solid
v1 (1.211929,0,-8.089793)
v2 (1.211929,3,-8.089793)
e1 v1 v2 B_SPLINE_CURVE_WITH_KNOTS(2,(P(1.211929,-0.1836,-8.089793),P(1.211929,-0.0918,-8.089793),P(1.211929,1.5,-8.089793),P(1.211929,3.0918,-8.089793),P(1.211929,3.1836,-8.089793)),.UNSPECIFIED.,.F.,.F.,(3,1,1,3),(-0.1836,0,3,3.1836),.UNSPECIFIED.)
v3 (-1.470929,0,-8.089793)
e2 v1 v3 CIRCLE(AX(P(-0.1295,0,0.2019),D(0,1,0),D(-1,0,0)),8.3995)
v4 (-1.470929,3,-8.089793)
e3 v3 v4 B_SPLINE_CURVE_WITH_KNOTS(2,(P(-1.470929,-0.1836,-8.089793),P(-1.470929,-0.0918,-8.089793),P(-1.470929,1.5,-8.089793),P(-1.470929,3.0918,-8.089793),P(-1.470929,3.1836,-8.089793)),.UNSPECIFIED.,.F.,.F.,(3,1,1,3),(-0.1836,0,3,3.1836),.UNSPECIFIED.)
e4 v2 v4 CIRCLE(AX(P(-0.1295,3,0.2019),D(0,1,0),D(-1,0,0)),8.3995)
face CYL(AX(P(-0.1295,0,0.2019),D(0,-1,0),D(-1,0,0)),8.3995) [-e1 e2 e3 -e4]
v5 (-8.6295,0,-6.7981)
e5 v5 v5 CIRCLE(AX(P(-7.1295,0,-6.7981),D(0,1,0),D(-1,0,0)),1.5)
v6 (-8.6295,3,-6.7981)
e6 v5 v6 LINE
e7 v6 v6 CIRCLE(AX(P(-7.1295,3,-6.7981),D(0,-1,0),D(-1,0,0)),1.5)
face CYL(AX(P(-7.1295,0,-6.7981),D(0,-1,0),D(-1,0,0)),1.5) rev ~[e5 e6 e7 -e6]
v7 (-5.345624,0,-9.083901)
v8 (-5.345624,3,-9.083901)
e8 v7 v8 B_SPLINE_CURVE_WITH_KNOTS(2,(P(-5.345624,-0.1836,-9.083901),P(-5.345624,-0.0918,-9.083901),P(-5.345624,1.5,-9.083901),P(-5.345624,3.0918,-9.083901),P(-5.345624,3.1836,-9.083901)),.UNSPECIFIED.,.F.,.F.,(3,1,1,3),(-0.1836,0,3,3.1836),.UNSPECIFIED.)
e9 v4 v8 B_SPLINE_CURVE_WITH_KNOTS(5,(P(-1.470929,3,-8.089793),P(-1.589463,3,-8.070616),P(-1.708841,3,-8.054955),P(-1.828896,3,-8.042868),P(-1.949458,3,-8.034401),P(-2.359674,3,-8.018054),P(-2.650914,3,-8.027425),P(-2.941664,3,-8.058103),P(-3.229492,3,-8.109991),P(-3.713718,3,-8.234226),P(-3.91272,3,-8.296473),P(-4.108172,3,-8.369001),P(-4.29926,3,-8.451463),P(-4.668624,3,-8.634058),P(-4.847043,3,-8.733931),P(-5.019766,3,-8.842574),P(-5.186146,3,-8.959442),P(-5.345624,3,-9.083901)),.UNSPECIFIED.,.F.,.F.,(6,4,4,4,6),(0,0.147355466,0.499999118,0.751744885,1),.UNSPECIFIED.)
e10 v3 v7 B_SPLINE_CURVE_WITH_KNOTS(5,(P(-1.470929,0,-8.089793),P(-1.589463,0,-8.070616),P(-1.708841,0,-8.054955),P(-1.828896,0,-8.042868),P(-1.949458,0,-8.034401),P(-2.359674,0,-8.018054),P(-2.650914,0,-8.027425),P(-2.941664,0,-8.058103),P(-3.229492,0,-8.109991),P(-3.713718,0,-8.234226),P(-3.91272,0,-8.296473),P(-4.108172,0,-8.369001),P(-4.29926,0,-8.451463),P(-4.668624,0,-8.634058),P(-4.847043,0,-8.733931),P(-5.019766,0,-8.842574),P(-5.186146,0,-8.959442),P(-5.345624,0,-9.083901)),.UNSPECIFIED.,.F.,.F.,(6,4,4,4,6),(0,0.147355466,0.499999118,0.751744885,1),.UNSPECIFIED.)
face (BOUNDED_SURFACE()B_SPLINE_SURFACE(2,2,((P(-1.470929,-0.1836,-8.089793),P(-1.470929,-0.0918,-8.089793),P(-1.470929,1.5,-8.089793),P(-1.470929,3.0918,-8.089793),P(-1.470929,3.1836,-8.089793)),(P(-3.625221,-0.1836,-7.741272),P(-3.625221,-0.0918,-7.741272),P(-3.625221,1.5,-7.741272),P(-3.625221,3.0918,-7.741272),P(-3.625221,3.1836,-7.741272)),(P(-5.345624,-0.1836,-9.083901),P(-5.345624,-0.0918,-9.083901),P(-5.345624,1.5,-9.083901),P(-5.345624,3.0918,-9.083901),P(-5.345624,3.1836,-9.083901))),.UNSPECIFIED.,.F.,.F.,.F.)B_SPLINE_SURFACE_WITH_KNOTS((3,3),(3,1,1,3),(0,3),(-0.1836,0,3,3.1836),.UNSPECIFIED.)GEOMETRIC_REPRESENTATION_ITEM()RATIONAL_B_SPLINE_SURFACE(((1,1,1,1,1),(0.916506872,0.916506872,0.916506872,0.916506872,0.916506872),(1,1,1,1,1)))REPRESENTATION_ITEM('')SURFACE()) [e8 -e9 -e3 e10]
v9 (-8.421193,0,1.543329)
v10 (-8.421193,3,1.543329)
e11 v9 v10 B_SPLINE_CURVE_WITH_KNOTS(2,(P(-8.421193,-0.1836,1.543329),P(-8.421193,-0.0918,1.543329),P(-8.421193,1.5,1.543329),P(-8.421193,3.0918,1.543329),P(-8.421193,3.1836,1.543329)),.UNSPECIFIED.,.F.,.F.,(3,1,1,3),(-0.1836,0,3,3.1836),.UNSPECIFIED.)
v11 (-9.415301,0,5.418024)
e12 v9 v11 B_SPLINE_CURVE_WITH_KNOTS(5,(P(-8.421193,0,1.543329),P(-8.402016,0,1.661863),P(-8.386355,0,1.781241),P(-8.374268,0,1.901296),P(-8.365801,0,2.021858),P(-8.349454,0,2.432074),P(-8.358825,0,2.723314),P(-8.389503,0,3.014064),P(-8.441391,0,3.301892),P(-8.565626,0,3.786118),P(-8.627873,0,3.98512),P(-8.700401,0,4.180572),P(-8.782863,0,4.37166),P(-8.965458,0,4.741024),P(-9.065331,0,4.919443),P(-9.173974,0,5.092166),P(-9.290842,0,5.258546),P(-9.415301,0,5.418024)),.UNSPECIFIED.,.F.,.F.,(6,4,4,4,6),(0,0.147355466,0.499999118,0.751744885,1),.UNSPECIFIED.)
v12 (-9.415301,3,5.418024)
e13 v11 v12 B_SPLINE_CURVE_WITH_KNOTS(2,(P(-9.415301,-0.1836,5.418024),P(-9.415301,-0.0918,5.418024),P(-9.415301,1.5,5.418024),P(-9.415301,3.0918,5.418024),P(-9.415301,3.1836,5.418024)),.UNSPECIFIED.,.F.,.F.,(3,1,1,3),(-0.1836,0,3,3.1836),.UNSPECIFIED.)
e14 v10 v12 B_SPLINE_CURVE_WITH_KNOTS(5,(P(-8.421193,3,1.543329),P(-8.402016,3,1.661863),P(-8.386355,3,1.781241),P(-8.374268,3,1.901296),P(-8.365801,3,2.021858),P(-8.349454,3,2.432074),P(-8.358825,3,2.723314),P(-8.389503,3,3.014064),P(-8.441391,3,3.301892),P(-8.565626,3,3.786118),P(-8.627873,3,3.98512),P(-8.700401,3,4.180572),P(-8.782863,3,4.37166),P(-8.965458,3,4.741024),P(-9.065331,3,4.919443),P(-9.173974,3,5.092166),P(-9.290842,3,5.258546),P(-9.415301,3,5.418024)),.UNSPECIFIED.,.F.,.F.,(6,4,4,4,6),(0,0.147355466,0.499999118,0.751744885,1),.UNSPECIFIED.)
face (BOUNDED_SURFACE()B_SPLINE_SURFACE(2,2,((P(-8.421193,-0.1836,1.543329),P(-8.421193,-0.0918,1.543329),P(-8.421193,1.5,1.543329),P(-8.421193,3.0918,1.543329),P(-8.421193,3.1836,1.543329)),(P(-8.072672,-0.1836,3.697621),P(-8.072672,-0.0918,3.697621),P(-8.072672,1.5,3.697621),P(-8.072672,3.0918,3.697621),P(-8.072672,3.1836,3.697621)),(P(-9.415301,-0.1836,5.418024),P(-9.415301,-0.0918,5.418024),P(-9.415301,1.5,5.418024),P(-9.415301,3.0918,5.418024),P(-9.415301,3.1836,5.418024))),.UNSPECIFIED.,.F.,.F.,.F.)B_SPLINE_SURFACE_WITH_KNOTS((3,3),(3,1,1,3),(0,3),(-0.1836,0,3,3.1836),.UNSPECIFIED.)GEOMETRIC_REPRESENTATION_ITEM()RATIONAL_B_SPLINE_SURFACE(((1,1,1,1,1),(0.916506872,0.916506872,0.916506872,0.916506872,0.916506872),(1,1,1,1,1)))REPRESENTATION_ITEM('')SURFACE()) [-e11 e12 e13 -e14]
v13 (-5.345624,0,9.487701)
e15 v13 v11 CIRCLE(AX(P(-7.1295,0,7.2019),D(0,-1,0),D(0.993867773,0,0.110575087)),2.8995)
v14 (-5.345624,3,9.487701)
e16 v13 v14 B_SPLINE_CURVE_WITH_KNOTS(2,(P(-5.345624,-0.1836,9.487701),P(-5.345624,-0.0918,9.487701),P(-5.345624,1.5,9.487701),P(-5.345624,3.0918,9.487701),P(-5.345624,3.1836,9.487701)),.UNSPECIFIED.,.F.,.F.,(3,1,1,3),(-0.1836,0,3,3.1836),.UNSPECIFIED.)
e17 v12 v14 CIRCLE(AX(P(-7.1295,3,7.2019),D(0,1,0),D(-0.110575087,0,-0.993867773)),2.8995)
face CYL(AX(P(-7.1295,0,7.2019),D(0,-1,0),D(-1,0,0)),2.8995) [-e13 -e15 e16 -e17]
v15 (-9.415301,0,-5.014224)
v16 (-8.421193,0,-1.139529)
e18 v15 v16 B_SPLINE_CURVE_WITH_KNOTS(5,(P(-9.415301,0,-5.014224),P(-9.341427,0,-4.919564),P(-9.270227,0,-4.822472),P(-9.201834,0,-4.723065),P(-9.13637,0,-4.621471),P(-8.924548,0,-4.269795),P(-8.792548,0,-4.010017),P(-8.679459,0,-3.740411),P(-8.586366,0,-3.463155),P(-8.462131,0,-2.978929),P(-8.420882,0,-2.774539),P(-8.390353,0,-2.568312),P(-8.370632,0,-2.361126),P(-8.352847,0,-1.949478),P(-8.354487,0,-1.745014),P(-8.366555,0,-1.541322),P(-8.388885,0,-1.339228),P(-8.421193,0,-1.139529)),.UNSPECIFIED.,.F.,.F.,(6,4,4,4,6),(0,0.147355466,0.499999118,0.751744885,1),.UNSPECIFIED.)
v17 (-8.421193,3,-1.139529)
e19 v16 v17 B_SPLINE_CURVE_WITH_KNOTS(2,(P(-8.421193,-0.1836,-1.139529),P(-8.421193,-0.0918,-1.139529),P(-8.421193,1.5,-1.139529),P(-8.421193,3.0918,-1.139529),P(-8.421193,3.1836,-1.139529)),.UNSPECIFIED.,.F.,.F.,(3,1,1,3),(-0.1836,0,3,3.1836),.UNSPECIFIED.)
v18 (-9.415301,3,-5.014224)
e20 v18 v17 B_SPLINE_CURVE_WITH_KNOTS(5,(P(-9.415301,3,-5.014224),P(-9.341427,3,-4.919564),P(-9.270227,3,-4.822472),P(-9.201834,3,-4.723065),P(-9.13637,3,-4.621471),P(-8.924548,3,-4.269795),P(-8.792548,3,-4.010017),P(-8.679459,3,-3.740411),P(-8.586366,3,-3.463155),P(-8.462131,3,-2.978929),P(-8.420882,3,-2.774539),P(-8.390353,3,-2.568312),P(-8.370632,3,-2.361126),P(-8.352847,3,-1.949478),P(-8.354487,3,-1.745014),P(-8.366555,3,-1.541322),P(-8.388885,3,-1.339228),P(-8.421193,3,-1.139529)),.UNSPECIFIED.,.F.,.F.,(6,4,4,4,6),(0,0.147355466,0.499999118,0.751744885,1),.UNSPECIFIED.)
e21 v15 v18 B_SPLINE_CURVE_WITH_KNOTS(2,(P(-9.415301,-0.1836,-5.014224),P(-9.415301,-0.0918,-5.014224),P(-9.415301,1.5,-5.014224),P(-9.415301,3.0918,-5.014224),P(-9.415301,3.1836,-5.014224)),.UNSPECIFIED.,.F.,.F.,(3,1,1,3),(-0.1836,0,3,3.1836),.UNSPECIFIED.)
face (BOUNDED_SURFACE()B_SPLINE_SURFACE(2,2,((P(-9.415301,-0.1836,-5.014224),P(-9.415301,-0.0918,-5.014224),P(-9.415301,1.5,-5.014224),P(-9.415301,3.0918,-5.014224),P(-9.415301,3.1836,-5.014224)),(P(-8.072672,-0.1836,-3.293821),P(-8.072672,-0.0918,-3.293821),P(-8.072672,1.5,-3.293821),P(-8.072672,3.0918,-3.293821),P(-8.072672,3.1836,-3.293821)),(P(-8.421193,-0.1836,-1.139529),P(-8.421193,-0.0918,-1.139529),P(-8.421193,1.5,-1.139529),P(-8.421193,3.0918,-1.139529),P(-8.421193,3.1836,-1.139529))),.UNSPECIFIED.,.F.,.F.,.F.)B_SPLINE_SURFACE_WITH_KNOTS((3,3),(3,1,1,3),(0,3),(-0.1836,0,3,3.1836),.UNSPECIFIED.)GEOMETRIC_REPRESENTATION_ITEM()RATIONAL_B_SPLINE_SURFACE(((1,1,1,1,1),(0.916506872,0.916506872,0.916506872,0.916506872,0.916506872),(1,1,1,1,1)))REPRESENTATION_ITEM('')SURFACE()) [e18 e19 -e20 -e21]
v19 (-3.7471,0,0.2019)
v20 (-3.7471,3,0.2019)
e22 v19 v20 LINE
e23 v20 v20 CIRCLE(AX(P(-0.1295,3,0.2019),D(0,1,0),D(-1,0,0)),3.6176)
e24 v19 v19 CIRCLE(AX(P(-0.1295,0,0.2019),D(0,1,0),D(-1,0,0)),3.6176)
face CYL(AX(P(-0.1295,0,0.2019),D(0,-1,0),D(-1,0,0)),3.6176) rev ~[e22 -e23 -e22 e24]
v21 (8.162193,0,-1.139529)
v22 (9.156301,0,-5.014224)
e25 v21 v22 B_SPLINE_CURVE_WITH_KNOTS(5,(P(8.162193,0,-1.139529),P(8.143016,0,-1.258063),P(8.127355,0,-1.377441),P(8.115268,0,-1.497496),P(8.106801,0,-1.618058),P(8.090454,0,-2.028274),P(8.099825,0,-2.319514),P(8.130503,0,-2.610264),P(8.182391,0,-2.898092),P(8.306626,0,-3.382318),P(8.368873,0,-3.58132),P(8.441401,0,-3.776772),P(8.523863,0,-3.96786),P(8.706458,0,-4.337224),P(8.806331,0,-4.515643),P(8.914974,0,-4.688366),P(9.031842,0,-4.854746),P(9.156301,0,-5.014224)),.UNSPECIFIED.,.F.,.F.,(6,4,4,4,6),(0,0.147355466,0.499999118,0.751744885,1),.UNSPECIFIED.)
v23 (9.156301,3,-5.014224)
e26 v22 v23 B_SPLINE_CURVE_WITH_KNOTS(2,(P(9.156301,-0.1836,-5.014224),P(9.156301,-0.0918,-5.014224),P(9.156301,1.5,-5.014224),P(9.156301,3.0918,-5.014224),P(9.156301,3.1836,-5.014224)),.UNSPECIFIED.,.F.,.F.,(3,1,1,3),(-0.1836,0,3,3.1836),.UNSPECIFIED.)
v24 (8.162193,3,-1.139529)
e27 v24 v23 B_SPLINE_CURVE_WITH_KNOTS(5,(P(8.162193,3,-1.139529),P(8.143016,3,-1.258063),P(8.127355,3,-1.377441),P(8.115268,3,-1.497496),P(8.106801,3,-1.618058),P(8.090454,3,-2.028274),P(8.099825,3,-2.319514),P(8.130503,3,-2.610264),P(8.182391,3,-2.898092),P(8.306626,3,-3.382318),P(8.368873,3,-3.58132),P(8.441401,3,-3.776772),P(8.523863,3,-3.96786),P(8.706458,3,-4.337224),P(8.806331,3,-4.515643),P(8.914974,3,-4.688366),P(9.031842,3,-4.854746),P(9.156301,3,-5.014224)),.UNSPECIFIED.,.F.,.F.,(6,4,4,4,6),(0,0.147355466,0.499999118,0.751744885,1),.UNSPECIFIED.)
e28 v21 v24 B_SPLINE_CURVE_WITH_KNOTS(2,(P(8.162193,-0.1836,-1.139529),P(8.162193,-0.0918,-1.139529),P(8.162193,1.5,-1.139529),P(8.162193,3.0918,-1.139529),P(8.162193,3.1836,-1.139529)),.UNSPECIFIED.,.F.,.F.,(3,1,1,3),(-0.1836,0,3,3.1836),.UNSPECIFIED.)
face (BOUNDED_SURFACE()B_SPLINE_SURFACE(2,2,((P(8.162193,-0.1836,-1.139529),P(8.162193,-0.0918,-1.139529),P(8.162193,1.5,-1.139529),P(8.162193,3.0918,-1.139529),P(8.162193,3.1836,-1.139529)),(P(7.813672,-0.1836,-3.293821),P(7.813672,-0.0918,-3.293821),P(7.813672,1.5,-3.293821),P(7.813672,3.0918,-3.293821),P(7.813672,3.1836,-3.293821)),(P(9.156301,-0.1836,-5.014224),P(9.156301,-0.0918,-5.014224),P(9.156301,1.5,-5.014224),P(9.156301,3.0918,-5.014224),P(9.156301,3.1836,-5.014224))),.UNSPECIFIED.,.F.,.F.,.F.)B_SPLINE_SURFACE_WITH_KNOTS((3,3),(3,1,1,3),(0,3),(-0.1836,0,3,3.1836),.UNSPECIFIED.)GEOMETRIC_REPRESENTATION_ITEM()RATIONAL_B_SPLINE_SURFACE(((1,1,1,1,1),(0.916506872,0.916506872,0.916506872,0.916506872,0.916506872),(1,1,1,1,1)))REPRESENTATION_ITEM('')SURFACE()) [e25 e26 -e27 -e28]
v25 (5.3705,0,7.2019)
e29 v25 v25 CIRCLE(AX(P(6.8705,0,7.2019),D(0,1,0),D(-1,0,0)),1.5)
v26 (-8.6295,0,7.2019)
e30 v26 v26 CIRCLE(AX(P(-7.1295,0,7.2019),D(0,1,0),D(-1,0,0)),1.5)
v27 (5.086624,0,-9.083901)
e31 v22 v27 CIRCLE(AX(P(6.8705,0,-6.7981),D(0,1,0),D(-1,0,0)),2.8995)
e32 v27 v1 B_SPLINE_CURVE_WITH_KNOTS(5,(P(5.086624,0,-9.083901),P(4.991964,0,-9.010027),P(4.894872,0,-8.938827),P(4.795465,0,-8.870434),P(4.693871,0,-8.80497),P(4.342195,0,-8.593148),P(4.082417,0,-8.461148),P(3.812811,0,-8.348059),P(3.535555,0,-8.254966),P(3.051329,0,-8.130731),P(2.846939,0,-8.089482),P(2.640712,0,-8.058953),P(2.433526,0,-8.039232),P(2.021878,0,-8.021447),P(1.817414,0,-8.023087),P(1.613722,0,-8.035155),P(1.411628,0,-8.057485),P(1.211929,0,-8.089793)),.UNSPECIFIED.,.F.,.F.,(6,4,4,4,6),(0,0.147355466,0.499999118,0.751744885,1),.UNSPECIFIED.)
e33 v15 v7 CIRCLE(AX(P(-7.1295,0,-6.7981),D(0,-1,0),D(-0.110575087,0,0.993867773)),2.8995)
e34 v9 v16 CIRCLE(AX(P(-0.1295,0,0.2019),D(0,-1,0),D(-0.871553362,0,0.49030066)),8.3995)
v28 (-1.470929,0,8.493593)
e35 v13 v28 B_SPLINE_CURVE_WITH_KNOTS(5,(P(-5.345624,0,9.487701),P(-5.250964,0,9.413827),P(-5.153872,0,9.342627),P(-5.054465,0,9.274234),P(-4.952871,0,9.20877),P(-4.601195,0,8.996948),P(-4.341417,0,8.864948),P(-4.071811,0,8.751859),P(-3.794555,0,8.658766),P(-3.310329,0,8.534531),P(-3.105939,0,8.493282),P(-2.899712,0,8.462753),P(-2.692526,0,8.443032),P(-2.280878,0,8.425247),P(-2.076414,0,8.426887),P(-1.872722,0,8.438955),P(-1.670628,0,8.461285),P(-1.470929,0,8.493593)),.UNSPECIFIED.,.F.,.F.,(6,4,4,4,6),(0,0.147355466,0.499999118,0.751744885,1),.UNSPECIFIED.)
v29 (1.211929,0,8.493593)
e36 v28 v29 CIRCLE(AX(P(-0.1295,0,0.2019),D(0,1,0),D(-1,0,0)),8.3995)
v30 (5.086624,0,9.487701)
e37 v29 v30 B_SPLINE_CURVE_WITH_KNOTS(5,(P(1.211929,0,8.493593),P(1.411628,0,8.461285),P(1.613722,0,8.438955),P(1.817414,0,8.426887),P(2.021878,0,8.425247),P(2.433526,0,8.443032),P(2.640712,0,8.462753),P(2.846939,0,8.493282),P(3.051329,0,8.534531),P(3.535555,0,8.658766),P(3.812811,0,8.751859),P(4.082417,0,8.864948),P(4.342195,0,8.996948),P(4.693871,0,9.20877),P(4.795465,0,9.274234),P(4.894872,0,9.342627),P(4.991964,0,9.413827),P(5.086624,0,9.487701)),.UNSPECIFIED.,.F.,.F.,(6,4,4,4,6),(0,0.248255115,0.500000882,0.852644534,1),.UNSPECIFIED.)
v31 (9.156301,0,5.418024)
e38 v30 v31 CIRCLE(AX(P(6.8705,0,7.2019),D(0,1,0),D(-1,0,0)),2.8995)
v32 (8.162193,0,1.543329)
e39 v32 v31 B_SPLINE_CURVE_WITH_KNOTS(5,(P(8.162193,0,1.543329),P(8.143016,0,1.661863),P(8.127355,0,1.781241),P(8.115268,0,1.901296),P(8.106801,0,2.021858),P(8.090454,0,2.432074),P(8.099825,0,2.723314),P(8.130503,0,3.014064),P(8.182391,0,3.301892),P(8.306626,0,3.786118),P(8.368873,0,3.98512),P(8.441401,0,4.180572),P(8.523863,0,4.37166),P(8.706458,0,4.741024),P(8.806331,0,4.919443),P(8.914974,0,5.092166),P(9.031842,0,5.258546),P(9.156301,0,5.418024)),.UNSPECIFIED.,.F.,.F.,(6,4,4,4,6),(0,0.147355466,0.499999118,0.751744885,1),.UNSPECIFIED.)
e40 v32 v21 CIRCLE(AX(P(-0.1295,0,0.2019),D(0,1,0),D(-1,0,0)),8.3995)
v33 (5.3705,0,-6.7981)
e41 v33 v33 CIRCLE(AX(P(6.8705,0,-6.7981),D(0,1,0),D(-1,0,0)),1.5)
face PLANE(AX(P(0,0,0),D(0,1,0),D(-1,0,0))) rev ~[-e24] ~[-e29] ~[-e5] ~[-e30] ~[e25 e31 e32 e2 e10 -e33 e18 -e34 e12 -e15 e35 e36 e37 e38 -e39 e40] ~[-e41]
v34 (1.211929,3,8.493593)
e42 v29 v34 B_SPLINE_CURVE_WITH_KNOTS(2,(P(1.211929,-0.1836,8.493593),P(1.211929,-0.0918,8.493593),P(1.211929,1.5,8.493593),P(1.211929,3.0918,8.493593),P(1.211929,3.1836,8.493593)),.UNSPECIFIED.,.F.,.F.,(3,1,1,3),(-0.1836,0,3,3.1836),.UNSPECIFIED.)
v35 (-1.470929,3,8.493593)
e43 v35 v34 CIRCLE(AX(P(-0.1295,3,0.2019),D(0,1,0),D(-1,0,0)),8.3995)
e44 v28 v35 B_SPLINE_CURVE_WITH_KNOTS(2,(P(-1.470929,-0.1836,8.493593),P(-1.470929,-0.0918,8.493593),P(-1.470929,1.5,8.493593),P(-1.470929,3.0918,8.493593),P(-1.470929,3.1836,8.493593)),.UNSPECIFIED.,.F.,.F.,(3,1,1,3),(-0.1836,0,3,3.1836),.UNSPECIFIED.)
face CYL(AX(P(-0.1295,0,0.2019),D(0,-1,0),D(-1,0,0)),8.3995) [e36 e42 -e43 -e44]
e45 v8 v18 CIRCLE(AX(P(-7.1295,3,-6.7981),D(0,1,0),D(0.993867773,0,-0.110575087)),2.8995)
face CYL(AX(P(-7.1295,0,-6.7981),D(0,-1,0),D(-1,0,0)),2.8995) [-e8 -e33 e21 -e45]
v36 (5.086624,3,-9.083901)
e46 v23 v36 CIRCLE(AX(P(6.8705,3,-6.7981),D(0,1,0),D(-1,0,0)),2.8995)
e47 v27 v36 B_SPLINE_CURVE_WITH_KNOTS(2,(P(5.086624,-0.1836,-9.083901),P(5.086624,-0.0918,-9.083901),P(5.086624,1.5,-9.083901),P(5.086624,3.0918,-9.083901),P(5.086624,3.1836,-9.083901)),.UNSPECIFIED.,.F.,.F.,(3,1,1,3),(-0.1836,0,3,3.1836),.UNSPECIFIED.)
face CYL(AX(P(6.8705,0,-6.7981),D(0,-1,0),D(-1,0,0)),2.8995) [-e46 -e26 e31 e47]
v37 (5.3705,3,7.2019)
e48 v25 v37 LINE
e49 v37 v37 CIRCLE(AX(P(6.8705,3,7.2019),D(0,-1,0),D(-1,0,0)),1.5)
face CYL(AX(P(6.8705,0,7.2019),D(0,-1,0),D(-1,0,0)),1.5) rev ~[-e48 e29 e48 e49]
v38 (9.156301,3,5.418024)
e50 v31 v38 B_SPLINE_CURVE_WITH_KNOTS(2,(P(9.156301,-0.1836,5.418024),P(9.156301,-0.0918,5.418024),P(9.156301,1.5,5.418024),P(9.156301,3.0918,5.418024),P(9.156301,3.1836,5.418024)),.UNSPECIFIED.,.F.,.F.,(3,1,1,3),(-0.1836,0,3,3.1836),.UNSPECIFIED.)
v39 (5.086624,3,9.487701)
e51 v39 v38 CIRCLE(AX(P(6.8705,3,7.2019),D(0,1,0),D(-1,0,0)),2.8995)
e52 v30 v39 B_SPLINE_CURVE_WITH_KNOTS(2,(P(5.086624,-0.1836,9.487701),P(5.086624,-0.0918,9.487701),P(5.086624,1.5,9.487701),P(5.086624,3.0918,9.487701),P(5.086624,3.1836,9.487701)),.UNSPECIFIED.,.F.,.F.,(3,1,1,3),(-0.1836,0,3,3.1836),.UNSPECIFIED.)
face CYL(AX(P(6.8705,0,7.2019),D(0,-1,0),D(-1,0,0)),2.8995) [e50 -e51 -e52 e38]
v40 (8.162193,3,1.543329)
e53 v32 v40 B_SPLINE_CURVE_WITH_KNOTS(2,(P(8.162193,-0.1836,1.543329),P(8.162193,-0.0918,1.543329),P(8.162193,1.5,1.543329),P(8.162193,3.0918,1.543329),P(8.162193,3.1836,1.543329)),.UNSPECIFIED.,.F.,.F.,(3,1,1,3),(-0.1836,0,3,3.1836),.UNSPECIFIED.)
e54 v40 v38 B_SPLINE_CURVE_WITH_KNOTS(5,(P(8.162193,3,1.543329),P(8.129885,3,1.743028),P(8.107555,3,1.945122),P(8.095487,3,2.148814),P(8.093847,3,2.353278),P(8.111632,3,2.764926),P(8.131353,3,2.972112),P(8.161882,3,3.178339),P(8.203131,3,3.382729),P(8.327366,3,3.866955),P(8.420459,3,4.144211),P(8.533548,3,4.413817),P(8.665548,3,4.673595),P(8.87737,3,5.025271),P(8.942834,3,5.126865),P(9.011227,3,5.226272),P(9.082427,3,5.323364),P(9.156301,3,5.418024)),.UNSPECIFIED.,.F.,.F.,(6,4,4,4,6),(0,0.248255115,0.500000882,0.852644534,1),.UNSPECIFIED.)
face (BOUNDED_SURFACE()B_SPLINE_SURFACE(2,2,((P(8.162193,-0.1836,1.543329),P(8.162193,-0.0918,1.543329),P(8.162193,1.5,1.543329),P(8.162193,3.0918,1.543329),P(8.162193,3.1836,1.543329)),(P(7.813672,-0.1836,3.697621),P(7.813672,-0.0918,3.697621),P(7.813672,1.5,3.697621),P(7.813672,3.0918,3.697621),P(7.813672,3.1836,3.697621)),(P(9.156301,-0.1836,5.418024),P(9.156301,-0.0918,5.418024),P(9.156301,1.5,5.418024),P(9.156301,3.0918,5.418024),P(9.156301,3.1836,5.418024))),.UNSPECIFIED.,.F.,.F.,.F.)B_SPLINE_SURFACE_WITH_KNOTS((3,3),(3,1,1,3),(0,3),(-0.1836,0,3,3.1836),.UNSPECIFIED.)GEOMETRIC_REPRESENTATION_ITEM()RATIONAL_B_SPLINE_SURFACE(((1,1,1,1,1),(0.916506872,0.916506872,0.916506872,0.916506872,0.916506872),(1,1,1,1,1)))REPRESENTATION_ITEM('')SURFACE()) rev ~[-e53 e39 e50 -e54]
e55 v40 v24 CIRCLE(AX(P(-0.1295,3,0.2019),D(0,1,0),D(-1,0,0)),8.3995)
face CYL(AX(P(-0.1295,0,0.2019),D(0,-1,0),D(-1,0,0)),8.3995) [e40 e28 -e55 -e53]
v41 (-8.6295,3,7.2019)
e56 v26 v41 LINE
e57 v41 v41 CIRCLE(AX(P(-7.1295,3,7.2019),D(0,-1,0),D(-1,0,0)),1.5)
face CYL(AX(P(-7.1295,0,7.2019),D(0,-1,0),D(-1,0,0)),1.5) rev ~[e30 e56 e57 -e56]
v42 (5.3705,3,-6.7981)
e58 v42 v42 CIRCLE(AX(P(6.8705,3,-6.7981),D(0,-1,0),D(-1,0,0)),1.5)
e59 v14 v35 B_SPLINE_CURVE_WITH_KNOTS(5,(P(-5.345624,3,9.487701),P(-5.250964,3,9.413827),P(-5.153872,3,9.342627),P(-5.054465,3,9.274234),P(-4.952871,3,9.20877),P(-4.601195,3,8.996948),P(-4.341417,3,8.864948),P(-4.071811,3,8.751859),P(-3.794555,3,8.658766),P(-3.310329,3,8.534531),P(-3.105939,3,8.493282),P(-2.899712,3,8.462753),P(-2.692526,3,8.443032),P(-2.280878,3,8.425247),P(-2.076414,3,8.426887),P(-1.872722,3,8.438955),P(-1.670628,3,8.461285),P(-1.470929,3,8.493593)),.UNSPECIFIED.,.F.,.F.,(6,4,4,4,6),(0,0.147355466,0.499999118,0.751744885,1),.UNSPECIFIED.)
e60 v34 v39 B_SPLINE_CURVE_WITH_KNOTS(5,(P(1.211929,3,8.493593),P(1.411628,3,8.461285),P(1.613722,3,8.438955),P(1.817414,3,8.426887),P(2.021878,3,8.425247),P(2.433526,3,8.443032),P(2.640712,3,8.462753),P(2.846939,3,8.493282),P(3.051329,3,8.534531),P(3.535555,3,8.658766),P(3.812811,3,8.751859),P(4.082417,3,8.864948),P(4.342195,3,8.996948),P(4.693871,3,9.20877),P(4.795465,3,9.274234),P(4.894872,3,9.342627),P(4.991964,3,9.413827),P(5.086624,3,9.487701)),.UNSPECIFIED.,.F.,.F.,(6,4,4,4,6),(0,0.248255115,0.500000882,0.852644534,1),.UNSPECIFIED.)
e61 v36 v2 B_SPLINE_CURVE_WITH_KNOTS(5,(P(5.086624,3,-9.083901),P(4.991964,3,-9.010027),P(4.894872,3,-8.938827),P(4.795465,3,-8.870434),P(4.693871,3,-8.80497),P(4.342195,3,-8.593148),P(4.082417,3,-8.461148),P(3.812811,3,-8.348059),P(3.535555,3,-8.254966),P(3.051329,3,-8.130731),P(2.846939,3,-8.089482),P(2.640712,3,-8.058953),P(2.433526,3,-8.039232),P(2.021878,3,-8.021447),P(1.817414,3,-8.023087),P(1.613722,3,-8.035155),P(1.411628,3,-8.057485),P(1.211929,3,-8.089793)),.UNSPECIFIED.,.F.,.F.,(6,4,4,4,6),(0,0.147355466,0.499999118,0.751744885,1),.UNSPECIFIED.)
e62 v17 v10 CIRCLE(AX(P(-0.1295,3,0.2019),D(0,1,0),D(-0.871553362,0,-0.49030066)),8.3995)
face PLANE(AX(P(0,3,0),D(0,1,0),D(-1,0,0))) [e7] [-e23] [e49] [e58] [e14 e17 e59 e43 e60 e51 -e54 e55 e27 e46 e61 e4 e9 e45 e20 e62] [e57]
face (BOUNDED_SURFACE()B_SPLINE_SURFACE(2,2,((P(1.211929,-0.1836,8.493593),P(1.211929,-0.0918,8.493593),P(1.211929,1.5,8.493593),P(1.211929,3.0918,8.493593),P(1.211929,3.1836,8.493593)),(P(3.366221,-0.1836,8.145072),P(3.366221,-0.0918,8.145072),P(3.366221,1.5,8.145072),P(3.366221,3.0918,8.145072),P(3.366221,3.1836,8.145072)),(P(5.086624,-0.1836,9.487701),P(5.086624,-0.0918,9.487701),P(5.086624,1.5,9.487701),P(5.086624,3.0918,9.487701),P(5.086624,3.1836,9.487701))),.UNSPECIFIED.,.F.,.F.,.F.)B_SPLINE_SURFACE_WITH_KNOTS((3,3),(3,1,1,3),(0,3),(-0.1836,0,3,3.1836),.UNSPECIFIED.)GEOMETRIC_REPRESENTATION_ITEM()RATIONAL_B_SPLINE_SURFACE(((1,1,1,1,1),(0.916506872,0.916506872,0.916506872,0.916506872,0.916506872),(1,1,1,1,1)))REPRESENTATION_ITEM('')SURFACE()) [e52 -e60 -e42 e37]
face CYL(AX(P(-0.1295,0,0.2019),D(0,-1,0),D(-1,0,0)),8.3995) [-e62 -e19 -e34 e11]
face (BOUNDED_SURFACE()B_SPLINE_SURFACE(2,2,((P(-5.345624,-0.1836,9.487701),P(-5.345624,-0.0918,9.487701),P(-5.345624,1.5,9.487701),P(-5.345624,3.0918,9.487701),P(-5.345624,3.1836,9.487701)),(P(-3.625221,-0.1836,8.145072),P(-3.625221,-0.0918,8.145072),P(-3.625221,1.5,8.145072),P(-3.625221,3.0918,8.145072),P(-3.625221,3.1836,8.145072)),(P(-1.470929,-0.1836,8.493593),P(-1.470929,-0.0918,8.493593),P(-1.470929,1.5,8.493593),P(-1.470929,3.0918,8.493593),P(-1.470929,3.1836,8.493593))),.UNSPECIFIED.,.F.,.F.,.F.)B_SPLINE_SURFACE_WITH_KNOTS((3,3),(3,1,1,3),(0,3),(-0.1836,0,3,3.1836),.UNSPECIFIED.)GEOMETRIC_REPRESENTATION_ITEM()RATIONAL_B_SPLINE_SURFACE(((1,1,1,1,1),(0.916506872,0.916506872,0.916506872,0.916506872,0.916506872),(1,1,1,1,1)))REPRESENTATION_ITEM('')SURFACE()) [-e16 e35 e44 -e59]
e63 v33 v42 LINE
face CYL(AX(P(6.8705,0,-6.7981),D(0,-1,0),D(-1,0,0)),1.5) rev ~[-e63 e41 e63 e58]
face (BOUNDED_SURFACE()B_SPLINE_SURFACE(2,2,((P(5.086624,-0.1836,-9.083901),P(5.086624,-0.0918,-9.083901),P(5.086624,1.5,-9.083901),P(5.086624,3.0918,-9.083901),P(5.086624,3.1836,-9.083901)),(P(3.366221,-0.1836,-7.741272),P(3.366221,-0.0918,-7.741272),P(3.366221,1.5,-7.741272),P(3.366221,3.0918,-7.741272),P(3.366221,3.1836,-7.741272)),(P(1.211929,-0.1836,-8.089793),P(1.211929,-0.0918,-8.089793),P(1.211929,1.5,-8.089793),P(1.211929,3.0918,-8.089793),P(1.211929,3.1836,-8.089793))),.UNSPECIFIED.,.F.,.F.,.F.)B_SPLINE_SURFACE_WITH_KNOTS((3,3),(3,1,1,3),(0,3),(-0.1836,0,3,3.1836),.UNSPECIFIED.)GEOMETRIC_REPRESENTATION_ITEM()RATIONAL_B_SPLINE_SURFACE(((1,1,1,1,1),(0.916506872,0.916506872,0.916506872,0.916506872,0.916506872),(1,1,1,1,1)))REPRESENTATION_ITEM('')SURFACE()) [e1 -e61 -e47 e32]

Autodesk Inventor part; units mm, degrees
ref_plane "YZ Plane" through (0, 0, 0) normal (1, 0, 0) x (0, 1, 0)
ref_plane "XZ Plane" through (0, 0, 0) normal (0, 1, 0) x (-1, 0, 0)
ref_plane "XY Plane" through (0, 0, 0) normal (0, 0, 1) x (1, 0, 0)
sketch "Эскиз1" plane through (0, 0, 0) normal (0, 1, 0) x (-1, 0, 0)
  circle A0 centre (0.1295, 0.2019) radius 7
  circle A1 centre (-6.8705, 7.2019) radius 1.5
  circle A2 centre (7.1295, 7.2019) radius 1.5
  circle A3 centre (7.1295, -6.7981) radius 1.5
  circle A4 centre (-6.8705, -6.7981) radius 1.5
  line L0 (-6.8705, -10.8093) -> (-6.8705, 13.8282) construction
  line L1 (14.3213, 7.2019) -> (-16.097, 7.2019) construction
  line L2 (7.1295, -11.068) -> (7.1295, 16.1729) construction
  arc A5 (6.5047, 14.6631) -> (7.1295, 16.1729) centre (4.9928, 16.1729) ccw construction
  line L3 (12.5583, -6.7981) -> (-15.6188, -6.7981) construction
  circle A6 centre (7.1295, 7.2019) radius 2.8995
  circle A7 centre (-6.8705, 7.2019) radius 2.8995
  circle A8 centre (-6.8705, -6.7981) radius 2.8995
  circle A9 centre (7.1295, -6.7981) radius 2.8995
  arc A10 (0.5599, -6.4772) -> (-0.2768, -6.4772) centre (0.1416, -8.4329) ccw
  line L4 (5.6295, -6.7981) -> (0.1295, -6.7981)
  line L5 (7.1295, -5.2981) -> (7.1295, 0.2019)
  line L6 (7.1295, 5.7019) -> (7.1295, 0.2019)
  line L7 (5.6295, 7.2019) -> (-5.3705, 7.2019)
  line L8 (-6.8705, 5.7019) -> (-6.8705, -5.2981)
  line L9 (-5.3705, -6.7981) -> (0.1295, -6.7981)
  circle A11 centre (0.1295, 0.2019) radius 8.3995
  circle A12 centre (0.1295, 0.2019) radius 3.6176
  point P0 (-3.971, 7.2019)
  point P1 (-6.8705, 4.3024)
  point P2 (-6.8705, -3.8986)
  point P3 (-3.971, -6.7981)
  point P4 (4.23, -6.7981)
  point P5 (7.1295, -3.8986)
  point P6 (7.1295, 4.3024)
  point P7 (4.23, 7.2019)
  point P8 (4.2478, 7.5225)
  point P9 (-3.9888, 7.5225)
  point P10 (-7.1911, 4.3202)
  point P11 (-7.1911, -3.9164)
  point P12 (-3.9888, -7.1187)
  point P13 (4.2478, -7.1187)
  point P14 (7.4501, -3.9164)
  point P15 (7.4501, 4.3202)
  dimension "d23" = 14
  dimension "d24" = 3
  dimension "d25" = 3
  dimension "d26" = 3
  dimension "d27" = 3
  dimension "d28" = 2
extrude "Выдавливание1" add sketch "Эскиз1" along normal blind 3 contours L5 A9 A0 | L6 A6 A11 A9 L5 | A0 A6 L6 | A0 L7 A6 | A6 L7 A11 L6 | A9 L4 A0 | A9 L5 A11 L4 | A9 A11 L5 | L6 A11 A6 | L7 A7 A11 A6 | A0 A7 L7 | A6 A11 L7 | L9 A8 A0 | L4 A9 A11 A8 L9 | L4 A11 A9 | A9 A11 L4 A3 L5 | L5 A3 A11 | A11 L6 A2 L7 A6 | A11 A2 L6 | A0 L8 A7 | A7 L8 A11 L7 | L7 A11 A7 | L7 A2 A11 | A8 L8 A0 | A8 L9 A11 L8 | A8 A11 L9 | A11 A3 L4 | L8 A8 A11 A7 | A7 A11 L8 | A11 L7 A1 L8 A7 | A11 A1 L7 | L8 A11 A8 | A8 A11 L8 A4 L9 | L9 A4 A11 | L8 A1 A11 | A11 A4 L8
extrude "Выдавливание3" add sketch "Эскиз1" along normal up to surface (3 mm away) contours A0
fillet "Сопряжение грани1" radius 5 2 edges at (-4.2478, 1.5, 7.5225) (-7.4501, 1.5, 4.3202)
fillet "Сопряжение грани2" radius 5 2 edges at (3.9888, 1.5, 7.5225) (7.1911, 1.5, 4.3202)
fillet_without_effect "Сопряжение грани3"
fillet "Сопряжение грани4" radius 5 2 edges at (7.1911, 1.5, -3.9164) (3.9888, 1.5, -7.1187)
fillet "Сопряжение грани5" radius 5 2 edges at (-4.2478, 1.5, -7.1187) (-7.4501, 1.5, -3.9164)
fillet_without_effect "Сопряжение грани6"
fillet_without_effect "Сопряжение грани7"
fillet_without_effect "Сопряжение грани8"
properties part number "крепление подшипника_1"
